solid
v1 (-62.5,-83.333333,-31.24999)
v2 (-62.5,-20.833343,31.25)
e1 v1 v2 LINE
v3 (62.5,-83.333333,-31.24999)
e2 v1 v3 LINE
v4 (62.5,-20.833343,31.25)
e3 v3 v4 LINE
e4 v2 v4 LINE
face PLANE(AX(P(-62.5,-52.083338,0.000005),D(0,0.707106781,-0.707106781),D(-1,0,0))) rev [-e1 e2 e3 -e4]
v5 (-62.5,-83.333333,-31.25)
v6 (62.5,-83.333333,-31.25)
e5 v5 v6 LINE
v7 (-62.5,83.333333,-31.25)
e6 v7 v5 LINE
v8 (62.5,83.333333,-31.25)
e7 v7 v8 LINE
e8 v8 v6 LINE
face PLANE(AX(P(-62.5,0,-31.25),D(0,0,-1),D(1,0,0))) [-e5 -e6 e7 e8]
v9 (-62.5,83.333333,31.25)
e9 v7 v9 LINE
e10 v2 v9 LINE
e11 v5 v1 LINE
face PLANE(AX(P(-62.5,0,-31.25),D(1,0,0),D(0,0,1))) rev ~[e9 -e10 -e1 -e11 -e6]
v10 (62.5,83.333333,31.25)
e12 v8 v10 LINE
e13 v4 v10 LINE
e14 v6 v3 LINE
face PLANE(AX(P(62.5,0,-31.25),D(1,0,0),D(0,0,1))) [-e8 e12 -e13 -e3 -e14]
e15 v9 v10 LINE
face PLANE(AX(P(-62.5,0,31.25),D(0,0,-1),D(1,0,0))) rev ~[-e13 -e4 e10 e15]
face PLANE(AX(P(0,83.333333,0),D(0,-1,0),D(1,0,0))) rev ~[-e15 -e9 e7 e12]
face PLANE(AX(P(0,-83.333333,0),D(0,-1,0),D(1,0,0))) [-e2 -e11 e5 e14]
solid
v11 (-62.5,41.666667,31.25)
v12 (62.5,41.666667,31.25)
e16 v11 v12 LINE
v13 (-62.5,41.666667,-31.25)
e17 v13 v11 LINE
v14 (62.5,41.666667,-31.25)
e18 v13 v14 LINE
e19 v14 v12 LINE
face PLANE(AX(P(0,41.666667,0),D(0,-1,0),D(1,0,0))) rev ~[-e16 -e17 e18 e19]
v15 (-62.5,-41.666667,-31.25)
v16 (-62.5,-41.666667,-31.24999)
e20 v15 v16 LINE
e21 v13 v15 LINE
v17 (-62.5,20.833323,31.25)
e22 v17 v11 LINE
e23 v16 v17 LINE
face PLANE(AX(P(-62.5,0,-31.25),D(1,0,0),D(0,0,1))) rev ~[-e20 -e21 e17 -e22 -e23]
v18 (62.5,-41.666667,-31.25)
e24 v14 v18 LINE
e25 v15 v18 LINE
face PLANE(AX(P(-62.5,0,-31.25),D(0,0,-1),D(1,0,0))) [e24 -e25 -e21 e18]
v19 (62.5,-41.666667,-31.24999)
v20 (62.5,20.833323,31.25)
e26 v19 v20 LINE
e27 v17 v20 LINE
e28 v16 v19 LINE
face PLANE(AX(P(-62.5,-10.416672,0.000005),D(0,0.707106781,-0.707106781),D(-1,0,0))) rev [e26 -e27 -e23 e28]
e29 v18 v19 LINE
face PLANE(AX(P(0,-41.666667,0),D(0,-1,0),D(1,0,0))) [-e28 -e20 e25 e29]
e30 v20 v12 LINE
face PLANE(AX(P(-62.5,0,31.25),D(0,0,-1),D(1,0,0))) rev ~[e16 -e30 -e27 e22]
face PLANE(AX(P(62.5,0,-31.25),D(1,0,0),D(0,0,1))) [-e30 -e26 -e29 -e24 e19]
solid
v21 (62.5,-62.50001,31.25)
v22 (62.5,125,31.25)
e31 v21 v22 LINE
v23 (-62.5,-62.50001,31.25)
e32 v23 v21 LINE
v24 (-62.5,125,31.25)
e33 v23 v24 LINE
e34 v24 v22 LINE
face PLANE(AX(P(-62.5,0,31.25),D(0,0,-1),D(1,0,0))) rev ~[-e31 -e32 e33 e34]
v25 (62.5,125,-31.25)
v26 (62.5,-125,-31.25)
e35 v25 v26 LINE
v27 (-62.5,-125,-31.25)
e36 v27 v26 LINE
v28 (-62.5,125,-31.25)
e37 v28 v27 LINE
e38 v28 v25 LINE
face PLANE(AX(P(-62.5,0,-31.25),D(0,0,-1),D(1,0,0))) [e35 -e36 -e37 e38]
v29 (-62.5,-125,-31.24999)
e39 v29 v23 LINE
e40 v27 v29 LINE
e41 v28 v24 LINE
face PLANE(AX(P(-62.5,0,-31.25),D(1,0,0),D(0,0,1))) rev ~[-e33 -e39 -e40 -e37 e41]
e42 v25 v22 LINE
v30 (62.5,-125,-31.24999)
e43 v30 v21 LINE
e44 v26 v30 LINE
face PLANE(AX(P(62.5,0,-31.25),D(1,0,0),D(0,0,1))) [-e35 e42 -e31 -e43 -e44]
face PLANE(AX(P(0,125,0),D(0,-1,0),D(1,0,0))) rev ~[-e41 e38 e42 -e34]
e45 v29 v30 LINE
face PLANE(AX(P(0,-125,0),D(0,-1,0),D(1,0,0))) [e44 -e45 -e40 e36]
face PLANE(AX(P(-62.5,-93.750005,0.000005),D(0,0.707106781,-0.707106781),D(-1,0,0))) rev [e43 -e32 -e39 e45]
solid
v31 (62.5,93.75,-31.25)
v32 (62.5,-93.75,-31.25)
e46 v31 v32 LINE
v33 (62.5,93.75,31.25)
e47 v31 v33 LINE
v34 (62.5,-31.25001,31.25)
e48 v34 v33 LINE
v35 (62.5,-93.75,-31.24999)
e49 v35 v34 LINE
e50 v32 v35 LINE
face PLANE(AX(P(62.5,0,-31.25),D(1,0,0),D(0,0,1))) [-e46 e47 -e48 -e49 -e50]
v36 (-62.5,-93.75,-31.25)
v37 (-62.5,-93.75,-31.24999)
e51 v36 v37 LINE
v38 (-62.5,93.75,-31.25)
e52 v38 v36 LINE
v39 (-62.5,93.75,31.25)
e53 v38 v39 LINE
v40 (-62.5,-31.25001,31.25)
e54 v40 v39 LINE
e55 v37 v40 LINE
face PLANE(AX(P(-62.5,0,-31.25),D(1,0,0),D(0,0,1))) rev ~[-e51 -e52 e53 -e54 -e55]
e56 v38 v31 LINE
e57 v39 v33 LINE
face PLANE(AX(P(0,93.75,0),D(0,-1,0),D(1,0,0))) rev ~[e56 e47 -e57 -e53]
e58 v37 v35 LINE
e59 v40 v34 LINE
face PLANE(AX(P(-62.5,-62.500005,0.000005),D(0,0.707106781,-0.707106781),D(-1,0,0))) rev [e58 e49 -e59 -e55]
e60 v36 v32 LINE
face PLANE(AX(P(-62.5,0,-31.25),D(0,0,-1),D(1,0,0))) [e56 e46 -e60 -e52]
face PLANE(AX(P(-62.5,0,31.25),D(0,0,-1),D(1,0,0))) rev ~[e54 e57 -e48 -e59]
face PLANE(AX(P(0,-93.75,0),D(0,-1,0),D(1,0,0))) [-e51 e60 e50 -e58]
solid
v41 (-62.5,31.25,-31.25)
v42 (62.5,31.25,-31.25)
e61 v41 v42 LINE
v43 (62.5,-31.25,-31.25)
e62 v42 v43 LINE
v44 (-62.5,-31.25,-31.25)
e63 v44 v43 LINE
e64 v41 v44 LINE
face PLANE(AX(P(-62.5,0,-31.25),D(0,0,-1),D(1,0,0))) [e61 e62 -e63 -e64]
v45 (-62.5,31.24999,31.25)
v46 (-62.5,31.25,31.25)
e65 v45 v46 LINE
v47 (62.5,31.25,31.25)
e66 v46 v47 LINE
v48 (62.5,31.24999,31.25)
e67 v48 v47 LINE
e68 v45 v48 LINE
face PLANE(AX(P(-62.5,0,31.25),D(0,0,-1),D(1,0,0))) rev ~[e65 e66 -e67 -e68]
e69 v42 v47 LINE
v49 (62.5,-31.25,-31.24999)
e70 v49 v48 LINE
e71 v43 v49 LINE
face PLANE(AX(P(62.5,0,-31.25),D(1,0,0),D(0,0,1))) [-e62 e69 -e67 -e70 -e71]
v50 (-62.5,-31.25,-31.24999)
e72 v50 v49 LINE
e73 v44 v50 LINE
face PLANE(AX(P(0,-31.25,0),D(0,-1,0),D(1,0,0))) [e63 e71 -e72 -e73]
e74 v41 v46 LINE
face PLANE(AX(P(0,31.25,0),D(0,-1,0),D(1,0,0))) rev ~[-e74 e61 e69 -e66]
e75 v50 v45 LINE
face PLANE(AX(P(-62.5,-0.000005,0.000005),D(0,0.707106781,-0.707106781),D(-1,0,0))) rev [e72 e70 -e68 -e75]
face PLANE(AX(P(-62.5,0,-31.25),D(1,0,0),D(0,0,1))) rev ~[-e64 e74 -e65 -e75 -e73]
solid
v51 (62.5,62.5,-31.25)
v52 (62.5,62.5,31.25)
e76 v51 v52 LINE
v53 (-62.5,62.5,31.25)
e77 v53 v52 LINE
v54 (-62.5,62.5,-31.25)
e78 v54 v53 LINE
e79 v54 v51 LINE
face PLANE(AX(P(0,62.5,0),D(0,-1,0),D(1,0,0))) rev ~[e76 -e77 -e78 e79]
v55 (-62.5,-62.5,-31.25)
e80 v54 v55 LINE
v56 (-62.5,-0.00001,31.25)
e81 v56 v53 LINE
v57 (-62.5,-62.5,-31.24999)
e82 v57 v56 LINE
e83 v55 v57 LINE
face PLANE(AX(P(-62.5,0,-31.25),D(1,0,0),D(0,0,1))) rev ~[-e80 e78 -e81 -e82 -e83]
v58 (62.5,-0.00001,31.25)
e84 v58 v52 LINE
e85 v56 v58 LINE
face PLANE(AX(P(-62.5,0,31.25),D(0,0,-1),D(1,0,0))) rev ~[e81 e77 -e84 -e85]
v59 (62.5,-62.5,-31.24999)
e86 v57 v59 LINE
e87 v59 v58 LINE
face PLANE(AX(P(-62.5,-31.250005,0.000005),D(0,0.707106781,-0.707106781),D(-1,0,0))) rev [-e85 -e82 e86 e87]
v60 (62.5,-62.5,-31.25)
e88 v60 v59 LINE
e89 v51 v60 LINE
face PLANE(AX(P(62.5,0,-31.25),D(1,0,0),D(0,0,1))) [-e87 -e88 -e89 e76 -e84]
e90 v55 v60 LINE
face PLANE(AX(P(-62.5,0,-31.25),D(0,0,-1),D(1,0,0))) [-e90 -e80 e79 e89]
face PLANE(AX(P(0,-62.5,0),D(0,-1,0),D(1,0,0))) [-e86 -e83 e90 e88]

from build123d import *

# Parameters (mm, degrees)
F0_W     = 125
F0_H     = 62.5
F1_DEPTH = 125
F2_DEPTH = 62.5
F3_DEPTH = 93.75
F4_DEPTH = 31.25
F5_DEPTH = 83.3333333333
F6_DEPTH = 41.6666666667
F7_SIZE2 = 62.49999
F7_SIZE  = 62.49999
F8_SIZE  = 62.49999
F9_SIZE  = 62.49999
F10_SIZE = 62.49999
F11_SIZE = 62.49999
F12_SIZE = 62.49999


# Not quite as in the source:
# - a fillet or chamfer is up to 0.001 mm smaller than in the source, because OpenCascade refuses the exact size


with BuildPart() as f1:
    # F0 (on Front) → F1 (new body, symmetric)
    with BuildSketch(Plane.XZ):
        Rectangle(F0_W, F0_H)
    extrude(amount=F1_DEPTH, both=True)

    # F7 (size 62.5 and 62.5 in the source; OpenCascade refuses exactly that, so slightly less here)
    f7_edges = [f1.edges().sort_by_distance(p)[0] for p in [
        (0, -125, 31.25),
    ]]
    chamfer(f7_edges, length=F7_SIZE, length2=F7_SIZE2)


with BuildPart() as f2:
    # F0 (on Front) → F2 (new body, symmetric)
    with BuildSketch(Plane.XZ):
        Rectangle(F0_W, F0_H)
    extrude(amount=F2_DEPTH, both=True)

    # F8 (size 62.5 in the source; OpenCascade refuses exactly that, so slightly less here)
    f8_edges = [f2.edges().sort_by_distance(p)[0] for p in [
        (0, -62.5, 31.25),
    ]]
    chamfer(f8_edges, length=F8_SIZE)


with BuildPart() as f3:
    # F0 (on Front) → F3 (new body, symmetric)
    with BuildSketch(Plane.XZ):
        Rectangle(F0_W, F0_H)
    extrude(amount=F3_DEPTH, both=True)

    # F9 (size 62.5 in the source; OpenCascade refuses exactly that, so slightly less here)
    f9_edges = [f3.edges().sort_by_distance(p)[0] for p in [
        (0, -93.75, 31.25),
    ]]
    chamfer(f9_edges, length=F9_SIZE)


with BuildPart() as f4:
    # F0 (on Front) → F4 (new body, symmetric)
    with BuildSketch(Plane.XZ):
        Rectangle(F0_W, F0_H)
    extrude(amount=F4_DEPTH, both=True)

    # F11 (size 62.5 in the source; OpenCascade refuses exactly that, so slightly less here)
    f11_edges = [f4.edges().sort_by_distance(p)[0] for p in [
        (0, -31.25, 31.25),
    ]]
    chamfer(f11_edges, length=F11_SIZE)


with BuildPart() as f5:
    # F0 (on Front) → F5 (new body, symmetric)
    with BuildSketch(Plane.XZ):
        Rectangle(F0_W, F0_H)
    extrude(amount=F5_DEPTH, both=True)

    # F10 (size 62.5 in the source; OpenCascade refuses exactly that, so slightly less here)
    f10_edges = [f5.edges().sort_by_distance(p)[0] for p in [
        (0, -83.333333, 31.25),
    ]]
    chamfer(f10_edges, length=F10_SIZE)


with BuildPart() as f6:
    # F0 (on Front) → F6 (new body, symmetric)
    with BuildSketch(Plane.XZ):
        Rectangle(F0_W, F0_H)
    extrude(amount=F6_DEPTH, both=True)

    # F12 (size 62.5 in the source; OpenCascade refuses exactly that, so slightly less here)
    f12_edges = [f6.edges().sort_by_distance(p)[0] for p in [
        (0, -41.666667, 31.25),
    ]]
    chamfer(f12_edges, length=F12_SIZE)


solid = Compound([f1.part, f2.part, f3.part, f4.part, f5.part, f6.part])
